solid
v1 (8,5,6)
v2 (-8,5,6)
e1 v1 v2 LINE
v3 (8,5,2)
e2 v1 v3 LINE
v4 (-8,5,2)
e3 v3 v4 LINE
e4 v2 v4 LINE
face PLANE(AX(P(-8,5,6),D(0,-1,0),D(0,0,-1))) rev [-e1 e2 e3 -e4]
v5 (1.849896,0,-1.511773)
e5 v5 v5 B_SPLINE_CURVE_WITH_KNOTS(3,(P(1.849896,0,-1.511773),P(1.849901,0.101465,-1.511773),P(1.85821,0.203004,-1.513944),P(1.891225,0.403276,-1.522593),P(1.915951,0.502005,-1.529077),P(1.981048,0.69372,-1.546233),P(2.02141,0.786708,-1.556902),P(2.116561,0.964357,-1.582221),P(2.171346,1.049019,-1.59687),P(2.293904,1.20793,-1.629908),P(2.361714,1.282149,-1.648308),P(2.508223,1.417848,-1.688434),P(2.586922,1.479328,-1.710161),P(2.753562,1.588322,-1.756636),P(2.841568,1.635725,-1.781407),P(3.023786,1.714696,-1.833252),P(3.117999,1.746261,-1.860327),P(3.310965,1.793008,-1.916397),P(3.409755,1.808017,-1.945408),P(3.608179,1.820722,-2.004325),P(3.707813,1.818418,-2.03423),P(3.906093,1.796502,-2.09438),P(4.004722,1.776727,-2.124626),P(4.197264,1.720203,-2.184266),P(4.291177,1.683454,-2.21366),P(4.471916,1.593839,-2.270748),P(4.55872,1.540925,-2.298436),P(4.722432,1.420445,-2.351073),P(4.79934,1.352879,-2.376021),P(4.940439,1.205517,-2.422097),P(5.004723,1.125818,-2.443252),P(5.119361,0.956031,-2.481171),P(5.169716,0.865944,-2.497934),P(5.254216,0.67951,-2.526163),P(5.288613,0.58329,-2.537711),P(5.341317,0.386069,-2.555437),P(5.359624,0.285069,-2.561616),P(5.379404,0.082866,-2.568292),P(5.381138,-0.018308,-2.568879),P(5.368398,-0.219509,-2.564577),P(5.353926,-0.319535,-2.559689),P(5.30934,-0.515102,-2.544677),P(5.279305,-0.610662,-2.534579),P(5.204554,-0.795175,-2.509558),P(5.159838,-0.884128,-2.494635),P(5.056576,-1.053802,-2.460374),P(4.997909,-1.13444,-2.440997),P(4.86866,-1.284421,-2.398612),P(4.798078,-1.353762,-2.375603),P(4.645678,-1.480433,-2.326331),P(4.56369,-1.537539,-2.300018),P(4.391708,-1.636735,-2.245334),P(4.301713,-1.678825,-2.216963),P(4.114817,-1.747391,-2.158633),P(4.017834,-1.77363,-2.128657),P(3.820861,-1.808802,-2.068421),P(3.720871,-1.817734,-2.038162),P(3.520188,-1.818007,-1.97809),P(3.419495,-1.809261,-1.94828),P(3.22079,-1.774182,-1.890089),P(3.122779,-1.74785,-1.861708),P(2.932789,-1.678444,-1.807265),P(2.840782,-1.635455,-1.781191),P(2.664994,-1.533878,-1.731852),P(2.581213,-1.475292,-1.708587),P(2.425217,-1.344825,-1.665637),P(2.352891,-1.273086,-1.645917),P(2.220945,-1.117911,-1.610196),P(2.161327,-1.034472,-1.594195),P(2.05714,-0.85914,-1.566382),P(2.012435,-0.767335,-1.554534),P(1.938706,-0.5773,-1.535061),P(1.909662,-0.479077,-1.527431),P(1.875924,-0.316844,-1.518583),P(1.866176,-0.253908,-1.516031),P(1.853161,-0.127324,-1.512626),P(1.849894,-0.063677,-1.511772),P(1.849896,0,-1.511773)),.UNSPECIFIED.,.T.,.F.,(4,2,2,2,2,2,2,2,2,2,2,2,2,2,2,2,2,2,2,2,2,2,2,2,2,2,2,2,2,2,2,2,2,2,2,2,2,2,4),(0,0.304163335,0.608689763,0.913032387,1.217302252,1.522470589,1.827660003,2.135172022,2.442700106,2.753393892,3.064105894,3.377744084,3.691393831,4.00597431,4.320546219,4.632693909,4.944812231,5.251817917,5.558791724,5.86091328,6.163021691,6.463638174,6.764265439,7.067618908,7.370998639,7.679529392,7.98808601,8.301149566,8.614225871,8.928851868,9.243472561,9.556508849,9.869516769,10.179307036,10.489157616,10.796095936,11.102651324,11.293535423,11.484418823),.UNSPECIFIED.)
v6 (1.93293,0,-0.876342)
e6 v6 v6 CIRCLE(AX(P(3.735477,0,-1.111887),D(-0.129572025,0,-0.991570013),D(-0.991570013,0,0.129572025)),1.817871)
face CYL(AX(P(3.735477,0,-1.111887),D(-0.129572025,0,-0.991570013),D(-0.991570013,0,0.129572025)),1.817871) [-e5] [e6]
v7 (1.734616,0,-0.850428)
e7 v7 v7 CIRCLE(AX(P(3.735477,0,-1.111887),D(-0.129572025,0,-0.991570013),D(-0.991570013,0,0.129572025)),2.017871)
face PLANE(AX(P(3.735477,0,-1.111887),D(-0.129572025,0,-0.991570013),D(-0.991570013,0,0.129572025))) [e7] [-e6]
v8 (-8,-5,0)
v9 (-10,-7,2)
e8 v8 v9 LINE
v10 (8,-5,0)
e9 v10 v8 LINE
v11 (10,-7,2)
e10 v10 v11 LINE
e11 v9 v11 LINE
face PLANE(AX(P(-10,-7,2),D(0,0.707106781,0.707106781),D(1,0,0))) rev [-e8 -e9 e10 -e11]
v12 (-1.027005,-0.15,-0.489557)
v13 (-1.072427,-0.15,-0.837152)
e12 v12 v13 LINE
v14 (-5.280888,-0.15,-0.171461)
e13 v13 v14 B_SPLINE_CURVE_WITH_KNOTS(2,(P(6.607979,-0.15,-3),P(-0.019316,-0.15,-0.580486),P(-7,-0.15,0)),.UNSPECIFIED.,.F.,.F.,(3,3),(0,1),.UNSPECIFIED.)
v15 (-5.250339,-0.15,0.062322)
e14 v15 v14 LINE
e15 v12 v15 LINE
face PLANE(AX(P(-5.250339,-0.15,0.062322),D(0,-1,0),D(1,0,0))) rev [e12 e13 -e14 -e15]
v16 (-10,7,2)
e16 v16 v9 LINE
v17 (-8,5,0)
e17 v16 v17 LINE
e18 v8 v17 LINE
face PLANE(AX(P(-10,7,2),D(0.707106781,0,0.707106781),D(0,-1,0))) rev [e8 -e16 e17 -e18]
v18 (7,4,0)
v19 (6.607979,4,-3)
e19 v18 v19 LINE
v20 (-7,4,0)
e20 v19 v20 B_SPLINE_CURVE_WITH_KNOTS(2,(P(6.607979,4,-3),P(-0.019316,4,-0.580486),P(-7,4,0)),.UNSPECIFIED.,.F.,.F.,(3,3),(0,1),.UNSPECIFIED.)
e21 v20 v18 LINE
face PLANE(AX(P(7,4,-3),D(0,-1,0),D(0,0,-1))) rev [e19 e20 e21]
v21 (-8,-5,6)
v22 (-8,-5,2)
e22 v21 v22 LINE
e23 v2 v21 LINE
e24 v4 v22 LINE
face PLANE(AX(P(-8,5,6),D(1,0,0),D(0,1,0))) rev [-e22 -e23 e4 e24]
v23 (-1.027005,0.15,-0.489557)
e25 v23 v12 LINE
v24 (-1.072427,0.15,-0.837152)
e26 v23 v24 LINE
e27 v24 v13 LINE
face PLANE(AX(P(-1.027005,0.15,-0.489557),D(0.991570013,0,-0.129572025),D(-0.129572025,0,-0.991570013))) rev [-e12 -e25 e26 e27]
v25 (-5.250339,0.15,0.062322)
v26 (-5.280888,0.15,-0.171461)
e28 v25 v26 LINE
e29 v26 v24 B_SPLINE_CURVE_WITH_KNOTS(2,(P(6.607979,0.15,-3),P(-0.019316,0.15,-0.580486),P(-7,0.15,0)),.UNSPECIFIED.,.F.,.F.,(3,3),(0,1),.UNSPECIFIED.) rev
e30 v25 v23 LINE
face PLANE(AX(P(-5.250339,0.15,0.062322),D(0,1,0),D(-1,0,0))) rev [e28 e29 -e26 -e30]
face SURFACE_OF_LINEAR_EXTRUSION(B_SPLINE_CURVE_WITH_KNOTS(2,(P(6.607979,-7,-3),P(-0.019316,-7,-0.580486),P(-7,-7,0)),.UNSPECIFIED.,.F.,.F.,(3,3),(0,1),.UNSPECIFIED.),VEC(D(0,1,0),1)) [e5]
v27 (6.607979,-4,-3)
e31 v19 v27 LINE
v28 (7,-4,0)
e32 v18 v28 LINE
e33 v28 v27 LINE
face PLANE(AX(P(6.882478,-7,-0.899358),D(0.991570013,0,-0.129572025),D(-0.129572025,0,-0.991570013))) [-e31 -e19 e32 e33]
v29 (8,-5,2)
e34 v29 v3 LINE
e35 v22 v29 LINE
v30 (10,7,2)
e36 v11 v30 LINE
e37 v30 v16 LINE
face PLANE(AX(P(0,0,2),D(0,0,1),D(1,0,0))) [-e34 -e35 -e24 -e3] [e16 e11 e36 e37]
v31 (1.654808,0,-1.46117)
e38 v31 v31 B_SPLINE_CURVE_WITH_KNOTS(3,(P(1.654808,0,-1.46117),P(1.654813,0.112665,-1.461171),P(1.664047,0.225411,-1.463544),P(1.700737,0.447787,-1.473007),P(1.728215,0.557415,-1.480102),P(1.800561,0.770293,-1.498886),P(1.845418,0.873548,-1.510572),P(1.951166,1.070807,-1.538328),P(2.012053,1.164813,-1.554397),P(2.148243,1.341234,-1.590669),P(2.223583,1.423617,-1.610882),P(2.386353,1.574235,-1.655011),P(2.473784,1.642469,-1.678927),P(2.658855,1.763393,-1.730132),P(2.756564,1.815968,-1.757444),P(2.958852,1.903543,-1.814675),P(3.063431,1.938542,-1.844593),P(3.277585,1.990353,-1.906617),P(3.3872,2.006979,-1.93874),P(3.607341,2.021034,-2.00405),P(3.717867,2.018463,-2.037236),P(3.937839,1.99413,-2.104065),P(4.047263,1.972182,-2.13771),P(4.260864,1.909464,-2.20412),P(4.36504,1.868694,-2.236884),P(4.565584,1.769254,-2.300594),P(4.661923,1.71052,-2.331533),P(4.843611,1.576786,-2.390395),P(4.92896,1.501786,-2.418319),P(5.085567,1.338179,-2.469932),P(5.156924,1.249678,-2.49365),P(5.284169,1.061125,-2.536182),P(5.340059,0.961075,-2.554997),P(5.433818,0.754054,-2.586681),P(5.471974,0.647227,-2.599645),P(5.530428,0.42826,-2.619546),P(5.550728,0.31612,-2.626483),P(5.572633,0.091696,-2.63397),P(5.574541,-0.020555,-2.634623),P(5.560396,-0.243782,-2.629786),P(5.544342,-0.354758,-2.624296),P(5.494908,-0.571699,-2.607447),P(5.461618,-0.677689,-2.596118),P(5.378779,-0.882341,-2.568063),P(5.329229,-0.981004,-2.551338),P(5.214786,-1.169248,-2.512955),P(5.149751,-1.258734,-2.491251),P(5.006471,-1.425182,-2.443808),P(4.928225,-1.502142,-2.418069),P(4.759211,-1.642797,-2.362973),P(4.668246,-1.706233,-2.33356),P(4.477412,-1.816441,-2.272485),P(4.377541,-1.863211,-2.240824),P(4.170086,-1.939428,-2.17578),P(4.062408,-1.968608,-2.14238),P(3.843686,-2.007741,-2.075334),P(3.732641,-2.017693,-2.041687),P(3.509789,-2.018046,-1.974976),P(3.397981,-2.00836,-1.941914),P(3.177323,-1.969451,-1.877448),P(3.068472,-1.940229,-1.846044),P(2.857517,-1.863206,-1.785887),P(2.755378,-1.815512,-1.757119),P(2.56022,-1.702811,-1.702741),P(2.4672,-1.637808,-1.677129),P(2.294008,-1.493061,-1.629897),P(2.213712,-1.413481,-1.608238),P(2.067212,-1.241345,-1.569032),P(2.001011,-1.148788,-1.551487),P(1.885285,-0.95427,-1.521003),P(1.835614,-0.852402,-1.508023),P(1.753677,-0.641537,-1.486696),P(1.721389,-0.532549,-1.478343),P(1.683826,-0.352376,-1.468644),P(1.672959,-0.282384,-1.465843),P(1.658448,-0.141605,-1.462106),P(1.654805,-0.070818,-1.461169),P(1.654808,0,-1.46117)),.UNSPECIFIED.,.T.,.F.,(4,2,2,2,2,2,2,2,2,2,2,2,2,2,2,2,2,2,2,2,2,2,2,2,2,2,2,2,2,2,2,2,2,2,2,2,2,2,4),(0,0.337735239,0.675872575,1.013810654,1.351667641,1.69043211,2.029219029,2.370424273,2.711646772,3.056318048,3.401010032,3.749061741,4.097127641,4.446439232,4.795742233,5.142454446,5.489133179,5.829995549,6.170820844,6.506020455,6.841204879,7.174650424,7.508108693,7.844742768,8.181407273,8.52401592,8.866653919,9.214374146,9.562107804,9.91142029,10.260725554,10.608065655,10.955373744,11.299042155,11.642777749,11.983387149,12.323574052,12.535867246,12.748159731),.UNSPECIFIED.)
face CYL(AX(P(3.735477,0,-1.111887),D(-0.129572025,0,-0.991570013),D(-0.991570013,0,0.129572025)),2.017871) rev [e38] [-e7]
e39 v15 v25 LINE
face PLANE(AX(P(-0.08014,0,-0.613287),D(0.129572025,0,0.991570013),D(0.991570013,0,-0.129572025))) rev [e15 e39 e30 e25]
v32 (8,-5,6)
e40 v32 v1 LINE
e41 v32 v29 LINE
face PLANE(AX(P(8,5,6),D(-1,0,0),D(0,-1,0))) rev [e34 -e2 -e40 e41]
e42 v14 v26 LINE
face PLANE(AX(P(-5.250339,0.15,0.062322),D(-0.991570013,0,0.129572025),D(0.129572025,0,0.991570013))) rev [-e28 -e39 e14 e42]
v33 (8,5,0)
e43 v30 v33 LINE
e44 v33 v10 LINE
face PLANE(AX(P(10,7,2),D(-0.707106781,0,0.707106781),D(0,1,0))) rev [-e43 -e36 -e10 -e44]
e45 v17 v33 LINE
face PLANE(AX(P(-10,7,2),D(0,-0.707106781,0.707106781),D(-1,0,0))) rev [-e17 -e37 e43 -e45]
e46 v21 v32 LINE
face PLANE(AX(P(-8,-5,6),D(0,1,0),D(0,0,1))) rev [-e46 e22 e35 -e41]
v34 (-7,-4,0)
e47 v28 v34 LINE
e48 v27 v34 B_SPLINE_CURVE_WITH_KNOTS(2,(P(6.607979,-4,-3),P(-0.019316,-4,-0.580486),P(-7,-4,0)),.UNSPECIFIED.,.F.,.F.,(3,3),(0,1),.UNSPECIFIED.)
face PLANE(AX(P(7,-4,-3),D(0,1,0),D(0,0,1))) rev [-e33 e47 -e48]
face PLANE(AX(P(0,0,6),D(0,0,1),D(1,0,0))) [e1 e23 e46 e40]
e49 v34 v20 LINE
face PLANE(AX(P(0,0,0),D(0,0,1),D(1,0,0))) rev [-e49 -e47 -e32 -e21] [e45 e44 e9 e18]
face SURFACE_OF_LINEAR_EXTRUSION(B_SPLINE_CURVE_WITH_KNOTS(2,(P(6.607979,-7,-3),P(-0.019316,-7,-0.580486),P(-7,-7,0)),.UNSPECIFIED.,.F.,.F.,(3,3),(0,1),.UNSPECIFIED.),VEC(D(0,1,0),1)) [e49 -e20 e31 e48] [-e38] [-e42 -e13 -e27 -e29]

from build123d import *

# Parameters (mm, degrees)
SKETCH1_W           = 20
SKETCH1_H           = 14
BOSS_EXTRUDE1_DEPTH = 2
CHAMFER3_SIZE       = 2
SKETCH2_W           = 14
SKETCH2_H           = 8
BOSS_EXTRUDE2_DEPTH = 3
CUT_EXTRUDE1_DEPTH  = 16.165750888
SKETCH5_W           = 16
SKETCH5_H           = 10
BOSS_EXTRUDE3_DEPTH = 4
SKETCH6_R           = 2.017871448
SKETCH6_R_2         = 1.817871448
SKETCH6_W           = 4.259238865
SKETCH6_H           = 0.3
CUT_EXTRUDE2_DEPTH  = 1.5


with BuildPart() as part:
    # Sketch1 → Boss-Extrude1 (new body)
    with BuildSketch(Plane.XY):
        Rectangle(SKETCH1_W, SKETCH1_H)
    extrude(amount=BOSS_EXTRUDE1_DEPTH)

    # Chamfer3
    chamfer3_edges = [part.edges().sort_by_distance(p)[0] for p in [
        (-10, 0, 0),
        (0, -7, 0),
        (0, 7, 0),
        (10, 0, 0),
    ]]
    chamfer(chamfer3_edges, length=CHAMFER3_SIZE - 0.0001)  # a hair under: the kernel refuses the full size

    # Sketch2 → Boss-Extrude2 (add)
    with BuildSketch(Plane(origin=(0, 0, 0), x_dir=(-1, 0, 0), z_dir=(0, 0, -1))):
        Rectangle(SKETCH2_W, SKETCH2_H)
    extrude(amount=BOSS_EXTRUDE2_DEPTH)

    # Sketch3 → Cut-Extrude1 (cut, through all)
    with BuildSketch(Plane(origin=(0, 4, 0), x_dir=(1, 0, 0), z_dir=(0, 1, 0))):
        with BuildLine():
            add(Edge.make_bspline(
                [(6.607979195, 3), (-0.019315958, 0.580486074), (-7, 0)],
                knots=[0, 0, 0, 1, 1, 1], degree=2))
            Line((6.607979195, 3), (-7, 3))
            Line((-7, 3), (-7, 0))
        make_face()
        Polygon((6.607979195, 3), (7, 0), (7, 3), align=None)
    extrude(amount=-CUT_EXTRUDE1_DEPTH, mode=Mode.SUBTRACT)

    # Sketch5 → Boss-Extrude3 (add)
    with BuildSketch(Plane.XY.offset(2)):
        Rectangle(SKETCH5_W, SKETCH5_H)
    extrude(amount=BOSS_EXTRUDE3_DEPTH)

    # Sketch6 → Cut-Extrude2 (cut)
    # profile 1 of 2: a face of its own
    with BuildSketch(Plane(origin=(6.607979195, -4, -3), x_dir=(-0.9915700128560622, 0, 0.12957202477629515), z_dir=(-0.12957202477629515, 0, -0.9915700128560622))):
        with Locations((3.092933481, 4)):
            Circle(SKETCH6_R)
        with Locations((3.092933481, 4)):
            Circle(SKETCH6_R_2, mode=Mode.SUBTRACT)
    # profile 2 of 2: a face of its own
    with BuildSketch(Plane(origin=(6.607979195, -4, -3), x_dir=(-0.9915700128560622, 0, 0.12957202477629515), z_dir=(-0.12957202477629515, 0, -0.9915700128560622))):
        with Locations((10.0255244, 4)):
            Rectangle(SKETCH6_W, SKETCH6_H)
    extrude(amount=-CUT_EXTRUDE2_DEPTH, mode=Mode.SUBTRACT)


solid = part.part
